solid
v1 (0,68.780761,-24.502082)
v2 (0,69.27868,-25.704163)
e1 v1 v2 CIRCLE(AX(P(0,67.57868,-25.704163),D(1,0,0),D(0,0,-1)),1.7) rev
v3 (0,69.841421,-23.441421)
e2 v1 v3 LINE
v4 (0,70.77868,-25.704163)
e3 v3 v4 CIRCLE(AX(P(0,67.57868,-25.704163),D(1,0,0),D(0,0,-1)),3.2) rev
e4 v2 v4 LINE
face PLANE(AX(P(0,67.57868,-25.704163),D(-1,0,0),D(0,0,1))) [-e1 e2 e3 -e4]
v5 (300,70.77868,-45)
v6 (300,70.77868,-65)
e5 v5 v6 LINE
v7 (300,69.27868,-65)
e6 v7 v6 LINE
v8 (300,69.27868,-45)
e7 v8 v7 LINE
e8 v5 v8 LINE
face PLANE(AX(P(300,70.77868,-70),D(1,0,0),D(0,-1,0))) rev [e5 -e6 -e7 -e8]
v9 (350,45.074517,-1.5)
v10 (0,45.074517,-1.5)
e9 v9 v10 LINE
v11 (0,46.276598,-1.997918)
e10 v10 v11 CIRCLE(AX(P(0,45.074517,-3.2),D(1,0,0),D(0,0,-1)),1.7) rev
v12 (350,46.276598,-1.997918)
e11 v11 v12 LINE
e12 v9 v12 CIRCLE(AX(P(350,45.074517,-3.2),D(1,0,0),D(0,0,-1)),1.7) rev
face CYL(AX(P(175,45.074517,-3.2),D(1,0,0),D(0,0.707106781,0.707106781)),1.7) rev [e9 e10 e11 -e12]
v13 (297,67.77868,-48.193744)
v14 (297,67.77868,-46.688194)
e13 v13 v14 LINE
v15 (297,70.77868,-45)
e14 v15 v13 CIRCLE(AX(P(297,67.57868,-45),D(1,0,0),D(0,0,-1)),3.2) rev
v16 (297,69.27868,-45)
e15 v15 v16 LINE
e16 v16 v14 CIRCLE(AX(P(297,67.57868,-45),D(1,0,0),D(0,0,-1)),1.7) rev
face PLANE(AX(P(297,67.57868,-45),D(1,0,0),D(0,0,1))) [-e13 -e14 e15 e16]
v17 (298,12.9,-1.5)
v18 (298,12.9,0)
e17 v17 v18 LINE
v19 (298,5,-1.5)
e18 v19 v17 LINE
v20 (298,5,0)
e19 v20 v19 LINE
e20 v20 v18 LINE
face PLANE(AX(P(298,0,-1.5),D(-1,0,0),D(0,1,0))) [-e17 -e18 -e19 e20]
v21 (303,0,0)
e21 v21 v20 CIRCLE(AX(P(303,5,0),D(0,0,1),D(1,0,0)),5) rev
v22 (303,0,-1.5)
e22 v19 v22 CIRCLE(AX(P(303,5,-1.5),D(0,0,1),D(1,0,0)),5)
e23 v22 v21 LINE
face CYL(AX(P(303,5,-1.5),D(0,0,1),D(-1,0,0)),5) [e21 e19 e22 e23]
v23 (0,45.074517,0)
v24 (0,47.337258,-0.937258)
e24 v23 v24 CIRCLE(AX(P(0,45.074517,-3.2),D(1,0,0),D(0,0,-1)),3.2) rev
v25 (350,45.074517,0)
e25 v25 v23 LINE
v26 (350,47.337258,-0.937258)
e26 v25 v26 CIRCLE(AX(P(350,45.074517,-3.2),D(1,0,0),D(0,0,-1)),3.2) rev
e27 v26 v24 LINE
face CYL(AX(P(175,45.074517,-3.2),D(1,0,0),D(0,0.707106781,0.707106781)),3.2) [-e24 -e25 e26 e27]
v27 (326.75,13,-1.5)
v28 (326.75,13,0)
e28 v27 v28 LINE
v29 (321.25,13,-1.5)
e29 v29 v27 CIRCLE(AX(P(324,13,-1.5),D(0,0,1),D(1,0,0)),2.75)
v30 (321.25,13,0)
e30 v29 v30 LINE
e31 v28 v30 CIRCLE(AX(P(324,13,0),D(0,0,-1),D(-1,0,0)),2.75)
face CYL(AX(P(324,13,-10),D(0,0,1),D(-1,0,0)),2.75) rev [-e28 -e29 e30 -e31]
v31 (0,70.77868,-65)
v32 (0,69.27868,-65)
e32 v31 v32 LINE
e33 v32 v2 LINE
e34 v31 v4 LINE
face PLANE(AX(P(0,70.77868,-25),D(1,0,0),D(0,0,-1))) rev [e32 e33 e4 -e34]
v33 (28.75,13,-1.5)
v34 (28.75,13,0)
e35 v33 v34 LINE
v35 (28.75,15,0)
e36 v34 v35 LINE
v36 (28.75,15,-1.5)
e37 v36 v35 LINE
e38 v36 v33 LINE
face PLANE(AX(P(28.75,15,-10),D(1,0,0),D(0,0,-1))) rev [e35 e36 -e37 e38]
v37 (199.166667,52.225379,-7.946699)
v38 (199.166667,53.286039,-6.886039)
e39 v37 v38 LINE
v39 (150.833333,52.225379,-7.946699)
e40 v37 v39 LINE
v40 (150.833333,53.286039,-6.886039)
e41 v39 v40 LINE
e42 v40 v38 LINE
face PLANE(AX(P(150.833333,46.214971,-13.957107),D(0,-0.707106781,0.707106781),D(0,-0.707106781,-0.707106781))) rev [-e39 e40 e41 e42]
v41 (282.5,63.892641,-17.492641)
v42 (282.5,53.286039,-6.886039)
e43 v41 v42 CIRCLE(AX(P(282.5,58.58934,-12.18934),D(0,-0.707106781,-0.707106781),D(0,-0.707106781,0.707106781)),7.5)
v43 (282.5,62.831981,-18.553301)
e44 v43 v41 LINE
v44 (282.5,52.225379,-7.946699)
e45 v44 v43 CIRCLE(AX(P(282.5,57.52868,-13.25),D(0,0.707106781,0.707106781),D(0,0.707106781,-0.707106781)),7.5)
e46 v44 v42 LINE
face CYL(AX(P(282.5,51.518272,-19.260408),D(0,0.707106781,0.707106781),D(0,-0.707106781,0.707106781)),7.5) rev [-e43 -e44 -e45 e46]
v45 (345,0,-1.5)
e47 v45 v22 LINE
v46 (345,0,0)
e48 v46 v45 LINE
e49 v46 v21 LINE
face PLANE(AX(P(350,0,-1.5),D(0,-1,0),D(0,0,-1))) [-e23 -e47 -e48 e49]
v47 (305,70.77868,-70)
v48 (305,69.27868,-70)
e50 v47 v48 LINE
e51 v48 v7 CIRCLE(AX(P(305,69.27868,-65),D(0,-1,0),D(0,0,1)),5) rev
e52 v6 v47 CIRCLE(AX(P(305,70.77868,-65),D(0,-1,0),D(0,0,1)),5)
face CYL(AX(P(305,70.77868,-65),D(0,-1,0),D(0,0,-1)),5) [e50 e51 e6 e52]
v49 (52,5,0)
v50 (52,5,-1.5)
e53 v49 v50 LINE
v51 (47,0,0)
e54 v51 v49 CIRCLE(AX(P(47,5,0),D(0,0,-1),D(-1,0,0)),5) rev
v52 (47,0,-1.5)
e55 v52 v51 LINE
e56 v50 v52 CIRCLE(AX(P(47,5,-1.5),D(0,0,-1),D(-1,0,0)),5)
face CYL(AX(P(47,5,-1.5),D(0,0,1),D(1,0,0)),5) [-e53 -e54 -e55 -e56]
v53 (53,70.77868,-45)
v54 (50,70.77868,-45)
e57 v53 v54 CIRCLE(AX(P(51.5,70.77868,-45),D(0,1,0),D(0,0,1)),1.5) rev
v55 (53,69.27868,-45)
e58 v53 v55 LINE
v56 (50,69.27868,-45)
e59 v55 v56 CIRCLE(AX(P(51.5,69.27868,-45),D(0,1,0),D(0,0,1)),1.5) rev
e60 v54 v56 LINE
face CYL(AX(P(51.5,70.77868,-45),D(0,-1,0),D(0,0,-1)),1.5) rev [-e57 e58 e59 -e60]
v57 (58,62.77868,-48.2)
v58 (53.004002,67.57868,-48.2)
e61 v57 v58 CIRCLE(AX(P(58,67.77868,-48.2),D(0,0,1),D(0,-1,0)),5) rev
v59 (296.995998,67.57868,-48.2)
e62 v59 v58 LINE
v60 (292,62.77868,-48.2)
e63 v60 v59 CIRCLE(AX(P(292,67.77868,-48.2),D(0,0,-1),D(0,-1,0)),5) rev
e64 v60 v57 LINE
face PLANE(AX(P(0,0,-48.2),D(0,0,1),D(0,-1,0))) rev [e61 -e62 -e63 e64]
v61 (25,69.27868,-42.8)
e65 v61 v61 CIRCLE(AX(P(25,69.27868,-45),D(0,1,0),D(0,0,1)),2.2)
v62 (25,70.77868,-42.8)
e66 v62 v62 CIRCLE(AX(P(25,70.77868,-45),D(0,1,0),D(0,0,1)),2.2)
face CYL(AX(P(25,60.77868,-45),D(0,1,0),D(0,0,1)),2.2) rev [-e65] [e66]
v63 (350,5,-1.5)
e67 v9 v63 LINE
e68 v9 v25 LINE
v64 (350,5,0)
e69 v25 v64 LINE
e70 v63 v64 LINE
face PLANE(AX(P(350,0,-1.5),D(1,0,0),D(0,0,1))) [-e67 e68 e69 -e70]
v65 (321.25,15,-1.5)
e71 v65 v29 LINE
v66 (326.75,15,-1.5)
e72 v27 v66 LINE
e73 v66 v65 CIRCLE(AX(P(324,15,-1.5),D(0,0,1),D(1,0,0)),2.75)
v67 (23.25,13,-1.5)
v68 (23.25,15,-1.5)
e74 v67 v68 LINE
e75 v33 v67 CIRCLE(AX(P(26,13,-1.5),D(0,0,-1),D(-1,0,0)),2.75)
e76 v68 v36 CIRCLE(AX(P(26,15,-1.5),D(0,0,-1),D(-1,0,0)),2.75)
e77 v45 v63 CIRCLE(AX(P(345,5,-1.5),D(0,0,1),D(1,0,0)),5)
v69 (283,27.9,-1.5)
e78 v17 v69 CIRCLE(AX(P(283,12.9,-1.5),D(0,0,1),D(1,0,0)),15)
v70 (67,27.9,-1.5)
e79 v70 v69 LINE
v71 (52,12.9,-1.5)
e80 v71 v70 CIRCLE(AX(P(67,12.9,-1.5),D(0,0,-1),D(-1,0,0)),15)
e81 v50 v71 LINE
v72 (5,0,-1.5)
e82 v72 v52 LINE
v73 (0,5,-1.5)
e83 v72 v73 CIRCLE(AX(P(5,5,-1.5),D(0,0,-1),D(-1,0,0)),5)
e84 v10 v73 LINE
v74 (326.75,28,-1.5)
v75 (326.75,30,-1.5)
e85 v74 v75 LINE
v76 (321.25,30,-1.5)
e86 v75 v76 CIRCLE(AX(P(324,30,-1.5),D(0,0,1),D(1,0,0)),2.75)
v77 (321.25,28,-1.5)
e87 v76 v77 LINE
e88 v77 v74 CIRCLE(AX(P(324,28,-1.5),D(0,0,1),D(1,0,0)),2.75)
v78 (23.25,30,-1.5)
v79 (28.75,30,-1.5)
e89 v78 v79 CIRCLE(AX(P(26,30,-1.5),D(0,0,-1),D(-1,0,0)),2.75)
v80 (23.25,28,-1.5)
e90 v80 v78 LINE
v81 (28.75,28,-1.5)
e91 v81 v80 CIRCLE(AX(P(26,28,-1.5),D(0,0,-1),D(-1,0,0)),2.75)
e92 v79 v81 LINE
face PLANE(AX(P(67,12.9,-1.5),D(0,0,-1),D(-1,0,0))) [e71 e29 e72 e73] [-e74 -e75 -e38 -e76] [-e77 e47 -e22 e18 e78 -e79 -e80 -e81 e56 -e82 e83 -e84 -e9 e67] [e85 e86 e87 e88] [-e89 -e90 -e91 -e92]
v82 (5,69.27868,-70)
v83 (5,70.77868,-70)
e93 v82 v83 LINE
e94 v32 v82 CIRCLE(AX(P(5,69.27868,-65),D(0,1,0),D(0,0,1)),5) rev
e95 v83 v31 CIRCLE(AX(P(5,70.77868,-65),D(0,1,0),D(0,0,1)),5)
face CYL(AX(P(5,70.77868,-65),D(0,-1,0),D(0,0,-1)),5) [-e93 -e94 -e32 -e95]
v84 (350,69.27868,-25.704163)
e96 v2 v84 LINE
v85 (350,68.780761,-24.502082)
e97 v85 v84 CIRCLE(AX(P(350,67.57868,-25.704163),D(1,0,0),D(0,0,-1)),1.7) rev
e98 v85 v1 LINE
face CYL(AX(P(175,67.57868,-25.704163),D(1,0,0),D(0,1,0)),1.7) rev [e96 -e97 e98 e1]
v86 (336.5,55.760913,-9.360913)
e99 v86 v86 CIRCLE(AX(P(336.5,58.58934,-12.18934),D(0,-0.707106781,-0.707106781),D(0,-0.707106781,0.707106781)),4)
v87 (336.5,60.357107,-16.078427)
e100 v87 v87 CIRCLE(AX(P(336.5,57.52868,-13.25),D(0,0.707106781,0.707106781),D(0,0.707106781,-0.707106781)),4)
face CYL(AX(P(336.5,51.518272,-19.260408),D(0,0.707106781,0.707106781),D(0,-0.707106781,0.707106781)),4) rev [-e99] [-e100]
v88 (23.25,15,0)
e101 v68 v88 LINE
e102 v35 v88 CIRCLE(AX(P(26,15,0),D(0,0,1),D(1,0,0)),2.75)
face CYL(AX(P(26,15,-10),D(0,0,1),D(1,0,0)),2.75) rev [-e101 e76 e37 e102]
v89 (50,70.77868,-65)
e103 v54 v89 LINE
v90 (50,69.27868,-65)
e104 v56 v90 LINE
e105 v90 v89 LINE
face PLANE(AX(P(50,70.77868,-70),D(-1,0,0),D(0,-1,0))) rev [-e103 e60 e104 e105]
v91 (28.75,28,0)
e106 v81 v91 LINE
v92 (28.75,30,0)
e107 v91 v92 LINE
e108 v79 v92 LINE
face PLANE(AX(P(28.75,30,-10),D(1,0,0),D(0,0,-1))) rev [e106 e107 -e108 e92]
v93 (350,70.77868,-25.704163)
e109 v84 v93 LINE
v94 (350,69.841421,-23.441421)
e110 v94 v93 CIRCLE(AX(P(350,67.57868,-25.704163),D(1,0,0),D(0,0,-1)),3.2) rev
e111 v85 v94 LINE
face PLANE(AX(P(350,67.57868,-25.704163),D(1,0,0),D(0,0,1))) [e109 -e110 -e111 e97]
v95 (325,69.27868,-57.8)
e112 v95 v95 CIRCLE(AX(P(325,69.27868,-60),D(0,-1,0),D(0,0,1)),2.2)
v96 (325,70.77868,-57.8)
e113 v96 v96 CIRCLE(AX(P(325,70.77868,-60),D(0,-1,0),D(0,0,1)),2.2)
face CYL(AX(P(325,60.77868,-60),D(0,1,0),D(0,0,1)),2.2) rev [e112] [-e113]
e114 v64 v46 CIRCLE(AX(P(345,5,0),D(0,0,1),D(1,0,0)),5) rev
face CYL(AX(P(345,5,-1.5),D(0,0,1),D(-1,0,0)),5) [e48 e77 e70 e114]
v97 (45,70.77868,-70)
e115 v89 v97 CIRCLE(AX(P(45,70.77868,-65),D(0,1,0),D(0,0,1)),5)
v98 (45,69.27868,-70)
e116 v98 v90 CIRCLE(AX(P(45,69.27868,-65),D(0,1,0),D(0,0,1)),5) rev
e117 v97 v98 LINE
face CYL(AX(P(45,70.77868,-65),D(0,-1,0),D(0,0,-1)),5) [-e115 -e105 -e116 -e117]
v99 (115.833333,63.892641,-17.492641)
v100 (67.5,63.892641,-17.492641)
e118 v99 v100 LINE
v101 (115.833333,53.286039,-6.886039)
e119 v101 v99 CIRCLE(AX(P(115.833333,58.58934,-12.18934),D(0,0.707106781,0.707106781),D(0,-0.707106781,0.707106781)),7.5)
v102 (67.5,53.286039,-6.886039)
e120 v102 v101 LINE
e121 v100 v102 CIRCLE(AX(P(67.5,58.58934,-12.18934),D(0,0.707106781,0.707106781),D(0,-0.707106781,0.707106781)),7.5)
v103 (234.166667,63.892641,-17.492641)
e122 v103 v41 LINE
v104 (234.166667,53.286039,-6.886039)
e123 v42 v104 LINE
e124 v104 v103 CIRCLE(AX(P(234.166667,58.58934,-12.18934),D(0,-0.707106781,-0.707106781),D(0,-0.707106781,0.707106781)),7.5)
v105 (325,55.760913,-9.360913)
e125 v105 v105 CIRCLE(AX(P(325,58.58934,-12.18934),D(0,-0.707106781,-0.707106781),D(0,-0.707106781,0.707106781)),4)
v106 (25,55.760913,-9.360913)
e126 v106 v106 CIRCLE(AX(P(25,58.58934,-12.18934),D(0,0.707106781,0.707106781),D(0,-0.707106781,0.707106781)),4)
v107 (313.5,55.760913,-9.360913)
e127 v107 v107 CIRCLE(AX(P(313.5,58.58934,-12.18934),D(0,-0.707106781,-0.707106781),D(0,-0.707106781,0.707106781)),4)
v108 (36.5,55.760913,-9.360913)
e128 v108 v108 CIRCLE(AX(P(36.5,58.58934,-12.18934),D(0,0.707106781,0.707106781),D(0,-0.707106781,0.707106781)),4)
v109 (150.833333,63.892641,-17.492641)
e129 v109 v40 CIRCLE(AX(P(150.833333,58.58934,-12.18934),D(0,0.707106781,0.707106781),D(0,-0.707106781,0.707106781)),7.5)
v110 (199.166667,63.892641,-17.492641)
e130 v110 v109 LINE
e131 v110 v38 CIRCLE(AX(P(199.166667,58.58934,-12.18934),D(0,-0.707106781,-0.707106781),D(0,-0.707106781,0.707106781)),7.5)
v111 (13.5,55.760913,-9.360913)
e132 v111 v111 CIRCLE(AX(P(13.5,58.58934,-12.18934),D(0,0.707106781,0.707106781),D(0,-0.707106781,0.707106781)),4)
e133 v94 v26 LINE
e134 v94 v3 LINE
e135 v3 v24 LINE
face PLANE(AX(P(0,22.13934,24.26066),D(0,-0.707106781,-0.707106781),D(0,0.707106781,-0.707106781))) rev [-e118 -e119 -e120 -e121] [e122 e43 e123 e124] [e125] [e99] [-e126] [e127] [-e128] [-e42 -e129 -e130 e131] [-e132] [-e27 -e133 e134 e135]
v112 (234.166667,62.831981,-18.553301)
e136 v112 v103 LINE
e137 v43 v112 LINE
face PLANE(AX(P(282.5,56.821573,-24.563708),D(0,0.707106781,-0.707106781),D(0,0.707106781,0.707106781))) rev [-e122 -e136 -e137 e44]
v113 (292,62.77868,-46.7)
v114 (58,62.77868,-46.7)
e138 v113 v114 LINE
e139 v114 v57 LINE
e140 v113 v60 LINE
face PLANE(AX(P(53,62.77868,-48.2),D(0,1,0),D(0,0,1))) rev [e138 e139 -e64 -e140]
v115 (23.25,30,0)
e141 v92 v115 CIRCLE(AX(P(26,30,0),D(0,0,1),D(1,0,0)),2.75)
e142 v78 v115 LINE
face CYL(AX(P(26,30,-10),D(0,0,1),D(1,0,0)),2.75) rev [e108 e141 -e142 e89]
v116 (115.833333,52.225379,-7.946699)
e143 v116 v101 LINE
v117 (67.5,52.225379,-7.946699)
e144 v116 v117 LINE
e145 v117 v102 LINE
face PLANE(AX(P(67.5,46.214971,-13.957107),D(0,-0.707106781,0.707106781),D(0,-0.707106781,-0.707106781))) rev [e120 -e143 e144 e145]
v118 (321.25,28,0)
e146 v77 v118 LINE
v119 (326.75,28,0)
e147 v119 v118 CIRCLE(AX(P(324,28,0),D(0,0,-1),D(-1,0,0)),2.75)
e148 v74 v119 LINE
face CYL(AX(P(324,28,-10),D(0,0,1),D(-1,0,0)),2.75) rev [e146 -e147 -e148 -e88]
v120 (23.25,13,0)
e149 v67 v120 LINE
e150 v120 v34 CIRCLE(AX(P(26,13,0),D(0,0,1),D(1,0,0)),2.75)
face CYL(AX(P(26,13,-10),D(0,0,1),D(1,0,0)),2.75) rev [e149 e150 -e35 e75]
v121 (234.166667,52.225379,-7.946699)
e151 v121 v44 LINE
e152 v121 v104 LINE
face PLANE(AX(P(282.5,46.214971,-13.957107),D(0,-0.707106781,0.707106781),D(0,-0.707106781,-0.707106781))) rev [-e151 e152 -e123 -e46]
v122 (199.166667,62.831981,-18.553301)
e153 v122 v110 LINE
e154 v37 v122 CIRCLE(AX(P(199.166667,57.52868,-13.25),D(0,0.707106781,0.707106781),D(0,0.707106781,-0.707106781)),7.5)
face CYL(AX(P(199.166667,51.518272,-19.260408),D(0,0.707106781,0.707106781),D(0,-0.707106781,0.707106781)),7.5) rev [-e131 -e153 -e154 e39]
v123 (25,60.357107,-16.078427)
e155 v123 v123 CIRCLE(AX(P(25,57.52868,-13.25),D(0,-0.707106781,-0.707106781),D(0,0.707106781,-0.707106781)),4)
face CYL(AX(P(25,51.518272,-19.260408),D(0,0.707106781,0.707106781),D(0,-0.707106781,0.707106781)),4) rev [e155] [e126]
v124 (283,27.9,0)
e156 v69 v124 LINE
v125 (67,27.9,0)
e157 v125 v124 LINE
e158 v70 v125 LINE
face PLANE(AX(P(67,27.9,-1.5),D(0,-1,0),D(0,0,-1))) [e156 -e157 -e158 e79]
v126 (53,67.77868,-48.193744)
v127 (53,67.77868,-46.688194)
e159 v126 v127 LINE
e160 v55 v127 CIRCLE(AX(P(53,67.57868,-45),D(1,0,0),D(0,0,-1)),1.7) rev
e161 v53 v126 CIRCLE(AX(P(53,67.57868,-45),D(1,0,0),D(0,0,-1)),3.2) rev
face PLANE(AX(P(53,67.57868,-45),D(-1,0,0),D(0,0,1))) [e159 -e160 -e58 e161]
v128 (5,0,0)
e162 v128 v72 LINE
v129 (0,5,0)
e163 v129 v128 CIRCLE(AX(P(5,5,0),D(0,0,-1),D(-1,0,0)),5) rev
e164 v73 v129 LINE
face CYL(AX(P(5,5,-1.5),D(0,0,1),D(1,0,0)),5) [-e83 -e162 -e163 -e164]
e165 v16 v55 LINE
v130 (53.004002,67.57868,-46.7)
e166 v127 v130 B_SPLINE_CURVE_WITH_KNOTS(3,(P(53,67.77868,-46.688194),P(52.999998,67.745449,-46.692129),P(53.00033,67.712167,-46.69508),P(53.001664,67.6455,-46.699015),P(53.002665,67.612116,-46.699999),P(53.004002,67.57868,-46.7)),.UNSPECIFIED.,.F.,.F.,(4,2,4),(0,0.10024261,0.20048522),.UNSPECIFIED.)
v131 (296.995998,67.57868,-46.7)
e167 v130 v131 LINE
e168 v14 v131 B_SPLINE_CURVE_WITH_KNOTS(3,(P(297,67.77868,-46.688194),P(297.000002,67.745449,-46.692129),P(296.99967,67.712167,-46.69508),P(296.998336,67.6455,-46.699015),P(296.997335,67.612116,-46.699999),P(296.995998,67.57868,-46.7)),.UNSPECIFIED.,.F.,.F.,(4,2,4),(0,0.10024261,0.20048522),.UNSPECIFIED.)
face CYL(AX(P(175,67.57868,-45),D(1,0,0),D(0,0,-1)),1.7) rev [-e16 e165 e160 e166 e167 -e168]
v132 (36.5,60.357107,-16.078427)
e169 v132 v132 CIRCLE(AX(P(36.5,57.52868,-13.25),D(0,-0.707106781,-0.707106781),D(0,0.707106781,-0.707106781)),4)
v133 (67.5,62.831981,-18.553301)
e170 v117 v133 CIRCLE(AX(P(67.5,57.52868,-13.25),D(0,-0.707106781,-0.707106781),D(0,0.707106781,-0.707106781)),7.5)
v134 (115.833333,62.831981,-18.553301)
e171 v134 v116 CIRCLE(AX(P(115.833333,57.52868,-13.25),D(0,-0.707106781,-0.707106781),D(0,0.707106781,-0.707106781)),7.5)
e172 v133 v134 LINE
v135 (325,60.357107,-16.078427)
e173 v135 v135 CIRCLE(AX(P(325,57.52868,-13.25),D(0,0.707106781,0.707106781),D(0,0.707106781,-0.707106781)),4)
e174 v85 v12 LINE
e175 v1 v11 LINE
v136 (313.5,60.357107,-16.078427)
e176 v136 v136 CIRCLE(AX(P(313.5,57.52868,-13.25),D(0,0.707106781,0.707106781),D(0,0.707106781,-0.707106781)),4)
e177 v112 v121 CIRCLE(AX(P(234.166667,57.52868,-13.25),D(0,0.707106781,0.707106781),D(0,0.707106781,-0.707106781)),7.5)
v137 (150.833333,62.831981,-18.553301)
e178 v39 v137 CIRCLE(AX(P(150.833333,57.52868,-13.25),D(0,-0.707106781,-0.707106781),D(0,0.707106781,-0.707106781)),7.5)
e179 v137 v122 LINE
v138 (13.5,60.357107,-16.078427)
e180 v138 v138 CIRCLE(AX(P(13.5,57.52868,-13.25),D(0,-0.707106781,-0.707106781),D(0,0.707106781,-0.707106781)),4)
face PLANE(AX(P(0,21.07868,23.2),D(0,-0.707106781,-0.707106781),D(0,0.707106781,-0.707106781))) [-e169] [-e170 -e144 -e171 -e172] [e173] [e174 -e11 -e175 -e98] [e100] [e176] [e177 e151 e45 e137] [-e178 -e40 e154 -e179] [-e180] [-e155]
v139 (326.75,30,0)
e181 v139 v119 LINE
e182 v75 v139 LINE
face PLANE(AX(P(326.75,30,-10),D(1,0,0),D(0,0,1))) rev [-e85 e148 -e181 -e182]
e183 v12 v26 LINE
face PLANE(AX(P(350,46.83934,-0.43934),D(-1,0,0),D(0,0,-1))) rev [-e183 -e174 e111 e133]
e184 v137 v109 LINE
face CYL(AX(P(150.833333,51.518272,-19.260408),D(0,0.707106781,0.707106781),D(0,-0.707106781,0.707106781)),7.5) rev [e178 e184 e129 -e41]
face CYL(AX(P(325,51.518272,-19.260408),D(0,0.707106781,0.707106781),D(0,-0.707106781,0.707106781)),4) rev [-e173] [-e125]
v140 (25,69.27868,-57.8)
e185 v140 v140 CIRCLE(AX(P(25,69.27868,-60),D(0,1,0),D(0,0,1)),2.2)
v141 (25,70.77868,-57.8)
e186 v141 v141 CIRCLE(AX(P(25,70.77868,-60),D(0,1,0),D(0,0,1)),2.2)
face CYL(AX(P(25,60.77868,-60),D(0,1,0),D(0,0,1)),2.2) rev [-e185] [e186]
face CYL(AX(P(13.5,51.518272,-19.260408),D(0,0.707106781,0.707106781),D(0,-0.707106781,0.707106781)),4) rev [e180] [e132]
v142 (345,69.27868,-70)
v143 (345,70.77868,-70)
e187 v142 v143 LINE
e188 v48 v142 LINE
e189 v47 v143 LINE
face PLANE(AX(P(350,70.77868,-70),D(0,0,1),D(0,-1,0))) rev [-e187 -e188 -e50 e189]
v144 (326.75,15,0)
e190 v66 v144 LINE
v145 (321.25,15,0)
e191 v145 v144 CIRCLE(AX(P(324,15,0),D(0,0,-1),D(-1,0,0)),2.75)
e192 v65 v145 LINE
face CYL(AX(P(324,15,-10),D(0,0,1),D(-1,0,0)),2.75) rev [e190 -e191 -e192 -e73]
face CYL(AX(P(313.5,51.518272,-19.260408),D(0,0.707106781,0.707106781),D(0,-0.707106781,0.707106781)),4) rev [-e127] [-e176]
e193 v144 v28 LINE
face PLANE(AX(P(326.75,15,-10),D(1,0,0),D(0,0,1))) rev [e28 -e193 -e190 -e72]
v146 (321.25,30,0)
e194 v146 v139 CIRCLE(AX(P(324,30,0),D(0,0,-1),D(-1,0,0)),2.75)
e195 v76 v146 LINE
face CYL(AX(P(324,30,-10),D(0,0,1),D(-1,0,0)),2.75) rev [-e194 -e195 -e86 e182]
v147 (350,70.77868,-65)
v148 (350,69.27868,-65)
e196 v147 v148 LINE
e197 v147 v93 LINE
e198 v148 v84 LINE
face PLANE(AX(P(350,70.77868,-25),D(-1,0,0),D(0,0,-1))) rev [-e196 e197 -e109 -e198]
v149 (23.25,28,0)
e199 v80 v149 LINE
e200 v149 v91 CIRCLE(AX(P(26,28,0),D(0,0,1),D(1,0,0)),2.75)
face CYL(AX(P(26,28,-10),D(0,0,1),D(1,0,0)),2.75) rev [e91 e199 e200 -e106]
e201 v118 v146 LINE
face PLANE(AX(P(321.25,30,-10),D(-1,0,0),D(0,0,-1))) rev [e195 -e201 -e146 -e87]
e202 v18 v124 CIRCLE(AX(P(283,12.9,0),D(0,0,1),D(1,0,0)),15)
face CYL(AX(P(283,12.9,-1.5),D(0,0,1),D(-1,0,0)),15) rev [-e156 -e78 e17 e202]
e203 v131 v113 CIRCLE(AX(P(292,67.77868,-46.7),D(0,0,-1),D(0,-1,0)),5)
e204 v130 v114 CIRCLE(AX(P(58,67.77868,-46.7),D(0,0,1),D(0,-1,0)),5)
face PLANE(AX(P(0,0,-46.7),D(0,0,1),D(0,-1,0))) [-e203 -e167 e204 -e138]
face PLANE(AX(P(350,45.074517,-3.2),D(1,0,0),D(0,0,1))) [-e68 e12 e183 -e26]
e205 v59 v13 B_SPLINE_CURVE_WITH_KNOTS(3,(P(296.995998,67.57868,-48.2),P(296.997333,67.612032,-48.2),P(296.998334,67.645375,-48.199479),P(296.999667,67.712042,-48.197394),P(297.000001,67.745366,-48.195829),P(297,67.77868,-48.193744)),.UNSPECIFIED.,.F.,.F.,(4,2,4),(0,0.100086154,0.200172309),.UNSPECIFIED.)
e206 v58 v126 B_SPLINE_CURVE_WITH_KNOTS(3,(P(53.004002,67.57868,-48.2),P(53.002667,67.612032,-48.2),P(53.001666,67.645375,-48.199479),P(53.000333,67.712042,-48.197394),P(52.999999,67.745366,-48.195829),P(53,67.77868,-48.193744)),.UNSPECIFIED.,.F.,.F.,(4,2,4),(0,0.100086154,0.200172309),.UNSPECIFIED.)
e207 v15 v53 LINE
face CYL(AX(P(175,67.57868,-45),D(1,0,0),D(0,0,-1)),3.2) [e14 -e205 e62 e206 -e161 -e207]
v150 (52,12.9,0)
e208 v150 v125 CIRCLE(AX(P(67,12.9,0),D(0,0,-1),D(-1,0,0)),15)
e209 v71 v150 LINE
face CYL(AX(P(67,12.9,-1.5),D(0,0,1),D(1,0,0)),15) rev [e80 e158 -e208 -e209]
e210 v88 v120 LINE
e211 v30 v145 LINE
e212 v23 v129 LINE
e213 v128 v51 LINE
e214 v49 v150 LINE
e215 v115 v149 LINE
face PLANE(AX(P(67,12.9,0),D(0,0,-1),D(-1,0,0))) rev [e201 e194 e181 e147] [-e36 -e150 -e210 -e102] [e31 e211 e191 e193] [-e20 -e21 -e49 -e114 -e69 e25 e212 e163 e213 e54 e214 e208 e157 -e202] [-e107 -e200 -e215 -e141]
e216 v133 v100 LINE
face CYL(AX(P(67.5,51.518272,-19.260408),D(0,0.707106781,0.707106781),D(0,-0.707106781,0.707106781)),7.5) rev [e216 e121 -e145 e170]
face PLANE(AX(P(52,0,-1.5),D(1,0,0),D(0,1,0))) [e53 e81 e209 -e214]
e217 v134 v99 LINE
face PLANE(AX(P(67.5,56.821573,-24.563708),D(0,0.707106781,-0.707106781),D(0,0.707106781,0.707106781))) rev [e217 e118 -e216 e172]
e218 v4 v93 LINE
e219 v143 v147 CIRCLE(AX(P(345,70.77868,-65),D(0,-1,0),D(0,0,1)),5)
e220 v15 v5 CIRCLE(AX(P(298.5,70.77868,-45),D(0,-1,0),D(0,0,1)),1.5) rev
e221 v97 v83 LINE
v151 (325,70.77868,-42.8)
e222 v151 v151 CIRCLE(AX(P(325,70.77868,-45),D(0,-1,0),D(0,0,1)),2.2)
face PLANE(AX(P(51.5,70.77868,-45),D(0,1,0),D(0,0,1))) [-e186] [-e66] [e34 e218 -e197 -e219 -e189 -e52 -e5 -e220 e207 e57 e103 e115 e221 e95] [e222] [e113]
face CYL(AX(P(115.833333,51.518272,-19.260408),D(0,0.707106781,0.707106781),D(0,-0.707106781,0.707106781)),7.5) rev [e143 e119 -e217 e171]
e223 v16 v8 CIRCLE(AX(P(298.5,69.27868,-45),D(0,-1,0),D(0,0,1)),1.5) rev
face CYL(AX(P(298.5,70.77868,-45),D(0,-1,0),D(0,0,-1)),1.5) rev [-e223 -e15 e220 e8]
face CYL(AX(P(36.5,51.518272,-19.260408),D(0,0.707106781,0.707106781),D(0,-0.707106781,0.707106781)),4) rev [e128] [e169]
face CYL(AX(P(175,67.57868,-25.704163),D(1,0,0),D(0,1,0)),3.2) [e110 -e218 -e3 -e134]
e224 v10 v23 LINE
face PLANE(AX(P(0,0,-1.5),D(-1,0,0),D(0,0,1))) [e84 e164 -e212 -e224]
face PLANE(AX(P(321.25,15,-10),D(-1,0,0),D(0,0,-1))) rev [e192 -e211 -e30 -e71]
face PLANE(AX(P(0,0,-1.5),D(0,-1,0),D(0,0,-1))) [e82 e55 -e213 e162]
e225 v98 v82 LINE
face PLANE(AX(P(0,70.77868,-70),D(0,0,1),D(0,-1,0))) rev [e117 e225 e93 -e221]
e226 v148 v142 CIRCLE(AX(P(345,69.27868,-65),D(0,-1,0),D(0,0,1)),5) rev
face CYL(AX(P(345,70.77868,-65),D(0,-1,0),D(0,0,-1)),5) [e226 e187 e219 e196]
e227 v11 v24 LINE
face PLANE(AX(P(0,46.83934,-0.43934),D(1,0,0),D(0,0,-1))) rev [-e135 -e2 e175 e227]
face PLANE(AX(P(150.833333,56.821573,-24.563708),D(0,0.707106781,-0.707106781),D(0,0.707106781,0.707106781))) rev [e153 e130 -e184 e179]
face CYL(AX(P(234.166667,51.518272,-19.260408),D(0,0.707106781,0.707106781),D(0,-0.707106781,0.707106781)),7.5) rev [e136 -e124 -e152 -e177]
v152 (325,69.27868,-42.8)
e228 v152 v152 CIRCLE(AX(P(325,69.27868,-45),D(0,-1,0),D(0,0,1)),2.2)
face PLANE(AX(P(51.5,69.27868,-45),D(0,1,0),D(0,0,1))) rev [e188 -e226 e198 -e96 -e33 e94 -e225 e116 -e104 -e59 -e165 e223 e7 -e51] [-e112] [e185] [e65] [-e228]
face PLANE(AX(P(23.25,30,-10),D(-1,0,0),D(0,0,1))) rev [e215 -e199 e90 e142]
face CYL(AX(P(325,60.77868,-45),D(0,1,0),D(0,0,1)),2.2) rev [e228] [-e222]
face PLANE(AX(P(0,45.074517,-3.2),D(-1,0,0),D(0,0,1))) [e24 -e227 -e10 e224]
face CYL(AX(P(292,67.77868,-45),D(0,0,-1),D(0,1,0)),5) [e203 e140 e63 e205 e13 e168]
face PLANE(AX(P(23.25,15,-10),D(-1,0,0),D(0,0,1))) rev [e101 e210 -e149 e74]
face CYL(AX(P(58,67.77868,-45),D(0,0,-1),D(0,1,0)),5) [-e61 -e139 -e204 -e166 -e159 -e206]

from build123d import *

# Parameters (mm, degrees)
BASE_FLANGE1_DEPTH     = 1.5
EDGE_FLANGE1_DEPTH     = 175
EDGE_FLANGE1_2_DEPTH   = 175
EDGE_FLANGE2_OUTLINE_W = 1.5
EDGE_FLANGE2_OUTLINE_H = 25
EDGE_FLANGE2_DEPTH     = 50
EDGE_FLANGE2_2_DEPTH   = 175
EDGE_FLANGE2_3_DEPTH   = 175
EDGE_FLANGE2_START     = 68
EDGE_FLANGE2_4_DEPTH   = 4
EDGE_FLANGE3_DEPTH     = 122
SKETCH15_R             = 2.2
CUT_EXTRUDE1_DEPTH     = 10
FILLET1_R              = 5
CUT_EXTRUDE2_DEPTH     = 10
CUT_EXTRUDE3_DEPTH     = 10
SKETCH18_R             = 4
CUT_EXTRUDE4_DEPTH     = 10


with BuildPart() as part:
    # Base-Flange1: sheet metal written as solids
    # Sketch1 → Base-Flange1 (new body)
    with BuildSketch(Plane.XY):
        with BuildLine():
            Line((0, 0), (0, 47.9))
            Line((0, 47.9), (175, 47.9))
            Line((175, 47.9), (175, 27.9))
            Line((175, 27.9), (67, 27.9))
            ThreePointArc((67, 27.9), (56.393398282, 23.506601718), (52, 12.9))
            Line((52, 12.9), (52, 0))
            Line((52, 0), (0, 0))
        make_face()
    extrude(amount=-BASE_FLANGE1_DEPTH)

    # Edge-Flange1: read off the stored shape, not the designer's step
    # Edge-Flange1 outline → Edge-Flange1 (cut)
    with BuildSketch(Plane.YZ):
        with BuildLine():
            ThreePointArc((45.0745166, 0), (46.299103584, -0.243585496), (47.3372583, -0.9372583))
            Line((47.3372583, -0.9372583), (47.9, -1.5))
            Line((47.9, -1.5), (47.9, 0))
            Line((47.9, 0), (45.0745166, 0))
        make_face()
    extrude(amount=EDGE_FLANGE1_DEPTH, mode=Mode.SUBTRACT)

    # Edge-Flange1 2 outline → Edge-Flange1 2 (add)
    with BuildSketch(Plane.YZ):
        with BuildLine():
            Line((71.839339828, -25.439339828), (47.9, -1.5))
            Line((47.9, -1.5), (45.0745166, -1.5))
            ThreePointArc((45.0745166, -1.5), (45.725078435, -1.629404795), (46.276598128, -1.997918472))
            Line((46.276598128, -1.997918472), (70.778679656, -26.5))
            Line((70.778679656, -26.5), (71.839339828, -25.439339828))
        make_face()
    extrude(amount=EDGE_FLANGE1_2_DEPTH)

    # Edge-Flange2 2 outline → Edge-Flange2 2 (cut)
    with BuildSketch(Plane.YZ):
        with BuildLine():
            ThreePointArc((69.841421356, -23.441421356), (70.53509416, -24.479576072), (70.778679656, -25.704163056))
            Line((70.778679656, -25.704163056), (70.778679656, -26.5))
            Line((70.778679656, -26.5), (71.839339828, -25.439339828))
            Line((71.839339828, -25.439339828), (69.841421356, -23.441421356))
        make_face()
    extrude(amount=EDGE_FLANGE2_2_DEPTH, mode=Mode.SUBTRACT)



with BuildPart() as body_2:
    # Edge-Flange2: read off the stored shape, not the designer's step
    # Edge-Flange2 outline → Edge-Flange2 (new body)
    with BuildSketch(Plane.YZ):
        with Locations((70.028679656, -57.5)):
            Rectangle(EDGE_FLANGE2_OUTLINE_W, EDGE_FLANGE2_OUTLINE_H)
    extrude(amount=EDGE_FLANGE2_DEPTH)


with BuildPart() as part_1:
    add(part.part)

    add(body_2.part)  # Edge-Flange2 3 merges body 2
    # Edge-Flange2 3 outline → Edge-Flange2 3 (add)
    with BuildSketch(Plane.YZ):
        with BuildLine():
            Line((70.778679656, -45), (70.778679656, -26.5))
            Line((70.778679656, -26.5), (68.780761184, -24.502081528))
            ThreePointArc((68.780761184, -24.502081528), (69.149274862, -25.053601221), (69.278679656, -25.704163056))
            Line((69.278679656, -25.704163056), (69.278679656, -45))
            Line((69.278679656, -45), (70.778679656, -45))
        make_face()
    extrude(amount=EDGE_FLANGE2_3_DEPTH)

    # Edge-Flange2 4 outline → Edge-Flange2 4 (cut)
    with BuildSketch(Plane(origin=(0, 0, 0), x_dir=(1, 0, 0), z_dir=(0, 1, 0)).offset(EDGE_FLANGE2_START)):
        with BuildLine():
            ThreePointArc((50, 45), (51.5, 43.5), (53, 45))
            Line((53, 45), (50, 45))
        make_face()
    extrude(amount=EDGE_FLANGE2_4_DEPTH, mode=Mode.SUBTRACT)

    # Edge-Flange3: sheet metal written as solids
    # Edge-Flange3 section (on a plane across the edge) → Edge-Flange3 (add)
    with BuildSketch(Plane(origin=(53, 69.278679656, -46.7), x_dir=(0, 0, 1), z_dir=(1, 0, 0))):
        with BuildLine():
            Line((-1.5, 1.7), (-1.5, 6.5))
            Line((-1.5, 6.5), (0, 6.5))
            Line((0, 6.5), (0, 1.7))
            ThreePointArc((0, 1.7), (0.497918472, 0.497918472), (1.7, 0))
            Line((1.7, 0), (1.7, -1.5))
            ThreePointArc((1.7, -1.5), (-0.5627417, -0.5627417), (-1.5, 1.7))
        make_face()
    extrude(amount=EDGE_FLANGE3_DEPTH)

    # Sketch15 → Cut-Extrude1 (cut)
    with BuildSketch(Plane(origin=(0, 70.778679656, 0), x_dir=(1, 0, 0), z_dir=(0, 1, 0))):
        with Locations(Location((25, 45, 0), (0, 0, 270))):
            Circle(SKETCH15_R)
        with Locations(Location((25, 60, 0), (0, 0, 270))):
            Circle(SKETCH15_R)
    extrude(amount=-CUT_EXTRUDE1_DEPTH, mode=Mode.SUBTRACT)

    # Fillet1
    fillet1_edges = [part_1.edges().sort_by_distance(p)[0] for p in [
        (52, 0, -0.75),
        (0, 0, -0.75),
        (50, 70.028679656, -70),
        (0, 70.028679656, -70),
        (53, 62.778679656, -47.45),
    ]]
    fillet(fillet1_edges, radius=FILLET1_R)

    # Sketch16 → Cut-Extrude2 (cut)
    with BuildSketch(Plane.XY):
        with BuildLine():
            Line((28.75, 30), (28.75, 28))
            ThreePointArc((28.75, 28), (26, 25.25), (23.25, 28))
            Line((23.25, 28), (23.25, 30))
            ThreePointArc((23.25, 30), (26, 32.75), (28.75, 30))
        make_face()
        with BuildLine():
            Line((28.75, 15), (28.75, 13))
            ThreePointArc((28.75, 13), (26, 10.25), (23.25, 13))
            Line((23.25, 13), (23.25, 15))
            ThreePointArc((23.25, 15), (26, 17.75), (28.75, 15))
        make_face()
    extrude(amount=-CUT_EXTRUDE2_DEPTH, mode=Mode.SUBTRACT)

    # Sketch17 → Cut-Extrude3 (cut)
    with BuildSketch(Plane(origin=(0, 23.2, 23.2), x_dir=(1, 0, 0), z_dir=(0, 0.7071067811865438, 0.7071067811865513))):
        with BuildLine():
            Line((150.833333333, 57.548084348), (199.166666667, 57.548084348))
            ThreePointArc((199.166666667, 57.548084348), (206.666666667, 50.048084348), (199.166666667, 42.548084348))
            Line((199.166666667, 42.548084348), (150.833333333, 42.548084348))
            ThreePointArc((150.833333333, 42.548084348), (143.333333333, 50.048084348), (150.833333333, 57.548084348))
        make_face()
        with BuildLine():
            Line((67.5, 57.548084348), (115.833333333, 57.548084348))
            ThreePointArc((115.833333333, 57.548084348), (123.333333333, 50.048084348), (115.833333333, 42.548084348))
            Line((115.833333333, 42.548084348), (67.5, 42.548084348))
            ThreePointArc((67.5, 42.548084348), (60, 50.048084348), (67.5, 57.548084348))
        make_face()
    extrude(amount=-CUT_EXTRUDE3_DEPTH, mode=Mode.SUBTRACT)

    # Sketch18 → Cut-Extrude4 (cut)
    with BuildSketch(Plane(origin=(0, 23.2, 23.2), x_dir=(1, 0, 0), z_dir=(0, 0.7071067811865438, 0.7071067811865513))):
        with Locations(Location((13.5, 50.048084348, 0), (0, 0, 270))):
            Circle(SKETCH18_R)
        with Locations(Location((36.5, 50.048084348, 0), (0, 0, 270))):
            Circle(SKETCH18_R)
        with Locations(Location((25, 50.048084348, 0), (0, 0, 270))):
            Circle(SKETCH18_R)
    extrude(amount=-CUT_EXTRUDE4_DEPTH, mode=Mode.SUBTRACT)

    # Mirror1: part across plane


with BuildPart() as part_2:
    add(part_1.part)
    add(part_1.part.mirror(Plane(origin=(175, 71.839339828, -25.439339828), x_dir=(0, 0, 1), z_dir=(-1, 0, 0))))


solid = part_2.part
